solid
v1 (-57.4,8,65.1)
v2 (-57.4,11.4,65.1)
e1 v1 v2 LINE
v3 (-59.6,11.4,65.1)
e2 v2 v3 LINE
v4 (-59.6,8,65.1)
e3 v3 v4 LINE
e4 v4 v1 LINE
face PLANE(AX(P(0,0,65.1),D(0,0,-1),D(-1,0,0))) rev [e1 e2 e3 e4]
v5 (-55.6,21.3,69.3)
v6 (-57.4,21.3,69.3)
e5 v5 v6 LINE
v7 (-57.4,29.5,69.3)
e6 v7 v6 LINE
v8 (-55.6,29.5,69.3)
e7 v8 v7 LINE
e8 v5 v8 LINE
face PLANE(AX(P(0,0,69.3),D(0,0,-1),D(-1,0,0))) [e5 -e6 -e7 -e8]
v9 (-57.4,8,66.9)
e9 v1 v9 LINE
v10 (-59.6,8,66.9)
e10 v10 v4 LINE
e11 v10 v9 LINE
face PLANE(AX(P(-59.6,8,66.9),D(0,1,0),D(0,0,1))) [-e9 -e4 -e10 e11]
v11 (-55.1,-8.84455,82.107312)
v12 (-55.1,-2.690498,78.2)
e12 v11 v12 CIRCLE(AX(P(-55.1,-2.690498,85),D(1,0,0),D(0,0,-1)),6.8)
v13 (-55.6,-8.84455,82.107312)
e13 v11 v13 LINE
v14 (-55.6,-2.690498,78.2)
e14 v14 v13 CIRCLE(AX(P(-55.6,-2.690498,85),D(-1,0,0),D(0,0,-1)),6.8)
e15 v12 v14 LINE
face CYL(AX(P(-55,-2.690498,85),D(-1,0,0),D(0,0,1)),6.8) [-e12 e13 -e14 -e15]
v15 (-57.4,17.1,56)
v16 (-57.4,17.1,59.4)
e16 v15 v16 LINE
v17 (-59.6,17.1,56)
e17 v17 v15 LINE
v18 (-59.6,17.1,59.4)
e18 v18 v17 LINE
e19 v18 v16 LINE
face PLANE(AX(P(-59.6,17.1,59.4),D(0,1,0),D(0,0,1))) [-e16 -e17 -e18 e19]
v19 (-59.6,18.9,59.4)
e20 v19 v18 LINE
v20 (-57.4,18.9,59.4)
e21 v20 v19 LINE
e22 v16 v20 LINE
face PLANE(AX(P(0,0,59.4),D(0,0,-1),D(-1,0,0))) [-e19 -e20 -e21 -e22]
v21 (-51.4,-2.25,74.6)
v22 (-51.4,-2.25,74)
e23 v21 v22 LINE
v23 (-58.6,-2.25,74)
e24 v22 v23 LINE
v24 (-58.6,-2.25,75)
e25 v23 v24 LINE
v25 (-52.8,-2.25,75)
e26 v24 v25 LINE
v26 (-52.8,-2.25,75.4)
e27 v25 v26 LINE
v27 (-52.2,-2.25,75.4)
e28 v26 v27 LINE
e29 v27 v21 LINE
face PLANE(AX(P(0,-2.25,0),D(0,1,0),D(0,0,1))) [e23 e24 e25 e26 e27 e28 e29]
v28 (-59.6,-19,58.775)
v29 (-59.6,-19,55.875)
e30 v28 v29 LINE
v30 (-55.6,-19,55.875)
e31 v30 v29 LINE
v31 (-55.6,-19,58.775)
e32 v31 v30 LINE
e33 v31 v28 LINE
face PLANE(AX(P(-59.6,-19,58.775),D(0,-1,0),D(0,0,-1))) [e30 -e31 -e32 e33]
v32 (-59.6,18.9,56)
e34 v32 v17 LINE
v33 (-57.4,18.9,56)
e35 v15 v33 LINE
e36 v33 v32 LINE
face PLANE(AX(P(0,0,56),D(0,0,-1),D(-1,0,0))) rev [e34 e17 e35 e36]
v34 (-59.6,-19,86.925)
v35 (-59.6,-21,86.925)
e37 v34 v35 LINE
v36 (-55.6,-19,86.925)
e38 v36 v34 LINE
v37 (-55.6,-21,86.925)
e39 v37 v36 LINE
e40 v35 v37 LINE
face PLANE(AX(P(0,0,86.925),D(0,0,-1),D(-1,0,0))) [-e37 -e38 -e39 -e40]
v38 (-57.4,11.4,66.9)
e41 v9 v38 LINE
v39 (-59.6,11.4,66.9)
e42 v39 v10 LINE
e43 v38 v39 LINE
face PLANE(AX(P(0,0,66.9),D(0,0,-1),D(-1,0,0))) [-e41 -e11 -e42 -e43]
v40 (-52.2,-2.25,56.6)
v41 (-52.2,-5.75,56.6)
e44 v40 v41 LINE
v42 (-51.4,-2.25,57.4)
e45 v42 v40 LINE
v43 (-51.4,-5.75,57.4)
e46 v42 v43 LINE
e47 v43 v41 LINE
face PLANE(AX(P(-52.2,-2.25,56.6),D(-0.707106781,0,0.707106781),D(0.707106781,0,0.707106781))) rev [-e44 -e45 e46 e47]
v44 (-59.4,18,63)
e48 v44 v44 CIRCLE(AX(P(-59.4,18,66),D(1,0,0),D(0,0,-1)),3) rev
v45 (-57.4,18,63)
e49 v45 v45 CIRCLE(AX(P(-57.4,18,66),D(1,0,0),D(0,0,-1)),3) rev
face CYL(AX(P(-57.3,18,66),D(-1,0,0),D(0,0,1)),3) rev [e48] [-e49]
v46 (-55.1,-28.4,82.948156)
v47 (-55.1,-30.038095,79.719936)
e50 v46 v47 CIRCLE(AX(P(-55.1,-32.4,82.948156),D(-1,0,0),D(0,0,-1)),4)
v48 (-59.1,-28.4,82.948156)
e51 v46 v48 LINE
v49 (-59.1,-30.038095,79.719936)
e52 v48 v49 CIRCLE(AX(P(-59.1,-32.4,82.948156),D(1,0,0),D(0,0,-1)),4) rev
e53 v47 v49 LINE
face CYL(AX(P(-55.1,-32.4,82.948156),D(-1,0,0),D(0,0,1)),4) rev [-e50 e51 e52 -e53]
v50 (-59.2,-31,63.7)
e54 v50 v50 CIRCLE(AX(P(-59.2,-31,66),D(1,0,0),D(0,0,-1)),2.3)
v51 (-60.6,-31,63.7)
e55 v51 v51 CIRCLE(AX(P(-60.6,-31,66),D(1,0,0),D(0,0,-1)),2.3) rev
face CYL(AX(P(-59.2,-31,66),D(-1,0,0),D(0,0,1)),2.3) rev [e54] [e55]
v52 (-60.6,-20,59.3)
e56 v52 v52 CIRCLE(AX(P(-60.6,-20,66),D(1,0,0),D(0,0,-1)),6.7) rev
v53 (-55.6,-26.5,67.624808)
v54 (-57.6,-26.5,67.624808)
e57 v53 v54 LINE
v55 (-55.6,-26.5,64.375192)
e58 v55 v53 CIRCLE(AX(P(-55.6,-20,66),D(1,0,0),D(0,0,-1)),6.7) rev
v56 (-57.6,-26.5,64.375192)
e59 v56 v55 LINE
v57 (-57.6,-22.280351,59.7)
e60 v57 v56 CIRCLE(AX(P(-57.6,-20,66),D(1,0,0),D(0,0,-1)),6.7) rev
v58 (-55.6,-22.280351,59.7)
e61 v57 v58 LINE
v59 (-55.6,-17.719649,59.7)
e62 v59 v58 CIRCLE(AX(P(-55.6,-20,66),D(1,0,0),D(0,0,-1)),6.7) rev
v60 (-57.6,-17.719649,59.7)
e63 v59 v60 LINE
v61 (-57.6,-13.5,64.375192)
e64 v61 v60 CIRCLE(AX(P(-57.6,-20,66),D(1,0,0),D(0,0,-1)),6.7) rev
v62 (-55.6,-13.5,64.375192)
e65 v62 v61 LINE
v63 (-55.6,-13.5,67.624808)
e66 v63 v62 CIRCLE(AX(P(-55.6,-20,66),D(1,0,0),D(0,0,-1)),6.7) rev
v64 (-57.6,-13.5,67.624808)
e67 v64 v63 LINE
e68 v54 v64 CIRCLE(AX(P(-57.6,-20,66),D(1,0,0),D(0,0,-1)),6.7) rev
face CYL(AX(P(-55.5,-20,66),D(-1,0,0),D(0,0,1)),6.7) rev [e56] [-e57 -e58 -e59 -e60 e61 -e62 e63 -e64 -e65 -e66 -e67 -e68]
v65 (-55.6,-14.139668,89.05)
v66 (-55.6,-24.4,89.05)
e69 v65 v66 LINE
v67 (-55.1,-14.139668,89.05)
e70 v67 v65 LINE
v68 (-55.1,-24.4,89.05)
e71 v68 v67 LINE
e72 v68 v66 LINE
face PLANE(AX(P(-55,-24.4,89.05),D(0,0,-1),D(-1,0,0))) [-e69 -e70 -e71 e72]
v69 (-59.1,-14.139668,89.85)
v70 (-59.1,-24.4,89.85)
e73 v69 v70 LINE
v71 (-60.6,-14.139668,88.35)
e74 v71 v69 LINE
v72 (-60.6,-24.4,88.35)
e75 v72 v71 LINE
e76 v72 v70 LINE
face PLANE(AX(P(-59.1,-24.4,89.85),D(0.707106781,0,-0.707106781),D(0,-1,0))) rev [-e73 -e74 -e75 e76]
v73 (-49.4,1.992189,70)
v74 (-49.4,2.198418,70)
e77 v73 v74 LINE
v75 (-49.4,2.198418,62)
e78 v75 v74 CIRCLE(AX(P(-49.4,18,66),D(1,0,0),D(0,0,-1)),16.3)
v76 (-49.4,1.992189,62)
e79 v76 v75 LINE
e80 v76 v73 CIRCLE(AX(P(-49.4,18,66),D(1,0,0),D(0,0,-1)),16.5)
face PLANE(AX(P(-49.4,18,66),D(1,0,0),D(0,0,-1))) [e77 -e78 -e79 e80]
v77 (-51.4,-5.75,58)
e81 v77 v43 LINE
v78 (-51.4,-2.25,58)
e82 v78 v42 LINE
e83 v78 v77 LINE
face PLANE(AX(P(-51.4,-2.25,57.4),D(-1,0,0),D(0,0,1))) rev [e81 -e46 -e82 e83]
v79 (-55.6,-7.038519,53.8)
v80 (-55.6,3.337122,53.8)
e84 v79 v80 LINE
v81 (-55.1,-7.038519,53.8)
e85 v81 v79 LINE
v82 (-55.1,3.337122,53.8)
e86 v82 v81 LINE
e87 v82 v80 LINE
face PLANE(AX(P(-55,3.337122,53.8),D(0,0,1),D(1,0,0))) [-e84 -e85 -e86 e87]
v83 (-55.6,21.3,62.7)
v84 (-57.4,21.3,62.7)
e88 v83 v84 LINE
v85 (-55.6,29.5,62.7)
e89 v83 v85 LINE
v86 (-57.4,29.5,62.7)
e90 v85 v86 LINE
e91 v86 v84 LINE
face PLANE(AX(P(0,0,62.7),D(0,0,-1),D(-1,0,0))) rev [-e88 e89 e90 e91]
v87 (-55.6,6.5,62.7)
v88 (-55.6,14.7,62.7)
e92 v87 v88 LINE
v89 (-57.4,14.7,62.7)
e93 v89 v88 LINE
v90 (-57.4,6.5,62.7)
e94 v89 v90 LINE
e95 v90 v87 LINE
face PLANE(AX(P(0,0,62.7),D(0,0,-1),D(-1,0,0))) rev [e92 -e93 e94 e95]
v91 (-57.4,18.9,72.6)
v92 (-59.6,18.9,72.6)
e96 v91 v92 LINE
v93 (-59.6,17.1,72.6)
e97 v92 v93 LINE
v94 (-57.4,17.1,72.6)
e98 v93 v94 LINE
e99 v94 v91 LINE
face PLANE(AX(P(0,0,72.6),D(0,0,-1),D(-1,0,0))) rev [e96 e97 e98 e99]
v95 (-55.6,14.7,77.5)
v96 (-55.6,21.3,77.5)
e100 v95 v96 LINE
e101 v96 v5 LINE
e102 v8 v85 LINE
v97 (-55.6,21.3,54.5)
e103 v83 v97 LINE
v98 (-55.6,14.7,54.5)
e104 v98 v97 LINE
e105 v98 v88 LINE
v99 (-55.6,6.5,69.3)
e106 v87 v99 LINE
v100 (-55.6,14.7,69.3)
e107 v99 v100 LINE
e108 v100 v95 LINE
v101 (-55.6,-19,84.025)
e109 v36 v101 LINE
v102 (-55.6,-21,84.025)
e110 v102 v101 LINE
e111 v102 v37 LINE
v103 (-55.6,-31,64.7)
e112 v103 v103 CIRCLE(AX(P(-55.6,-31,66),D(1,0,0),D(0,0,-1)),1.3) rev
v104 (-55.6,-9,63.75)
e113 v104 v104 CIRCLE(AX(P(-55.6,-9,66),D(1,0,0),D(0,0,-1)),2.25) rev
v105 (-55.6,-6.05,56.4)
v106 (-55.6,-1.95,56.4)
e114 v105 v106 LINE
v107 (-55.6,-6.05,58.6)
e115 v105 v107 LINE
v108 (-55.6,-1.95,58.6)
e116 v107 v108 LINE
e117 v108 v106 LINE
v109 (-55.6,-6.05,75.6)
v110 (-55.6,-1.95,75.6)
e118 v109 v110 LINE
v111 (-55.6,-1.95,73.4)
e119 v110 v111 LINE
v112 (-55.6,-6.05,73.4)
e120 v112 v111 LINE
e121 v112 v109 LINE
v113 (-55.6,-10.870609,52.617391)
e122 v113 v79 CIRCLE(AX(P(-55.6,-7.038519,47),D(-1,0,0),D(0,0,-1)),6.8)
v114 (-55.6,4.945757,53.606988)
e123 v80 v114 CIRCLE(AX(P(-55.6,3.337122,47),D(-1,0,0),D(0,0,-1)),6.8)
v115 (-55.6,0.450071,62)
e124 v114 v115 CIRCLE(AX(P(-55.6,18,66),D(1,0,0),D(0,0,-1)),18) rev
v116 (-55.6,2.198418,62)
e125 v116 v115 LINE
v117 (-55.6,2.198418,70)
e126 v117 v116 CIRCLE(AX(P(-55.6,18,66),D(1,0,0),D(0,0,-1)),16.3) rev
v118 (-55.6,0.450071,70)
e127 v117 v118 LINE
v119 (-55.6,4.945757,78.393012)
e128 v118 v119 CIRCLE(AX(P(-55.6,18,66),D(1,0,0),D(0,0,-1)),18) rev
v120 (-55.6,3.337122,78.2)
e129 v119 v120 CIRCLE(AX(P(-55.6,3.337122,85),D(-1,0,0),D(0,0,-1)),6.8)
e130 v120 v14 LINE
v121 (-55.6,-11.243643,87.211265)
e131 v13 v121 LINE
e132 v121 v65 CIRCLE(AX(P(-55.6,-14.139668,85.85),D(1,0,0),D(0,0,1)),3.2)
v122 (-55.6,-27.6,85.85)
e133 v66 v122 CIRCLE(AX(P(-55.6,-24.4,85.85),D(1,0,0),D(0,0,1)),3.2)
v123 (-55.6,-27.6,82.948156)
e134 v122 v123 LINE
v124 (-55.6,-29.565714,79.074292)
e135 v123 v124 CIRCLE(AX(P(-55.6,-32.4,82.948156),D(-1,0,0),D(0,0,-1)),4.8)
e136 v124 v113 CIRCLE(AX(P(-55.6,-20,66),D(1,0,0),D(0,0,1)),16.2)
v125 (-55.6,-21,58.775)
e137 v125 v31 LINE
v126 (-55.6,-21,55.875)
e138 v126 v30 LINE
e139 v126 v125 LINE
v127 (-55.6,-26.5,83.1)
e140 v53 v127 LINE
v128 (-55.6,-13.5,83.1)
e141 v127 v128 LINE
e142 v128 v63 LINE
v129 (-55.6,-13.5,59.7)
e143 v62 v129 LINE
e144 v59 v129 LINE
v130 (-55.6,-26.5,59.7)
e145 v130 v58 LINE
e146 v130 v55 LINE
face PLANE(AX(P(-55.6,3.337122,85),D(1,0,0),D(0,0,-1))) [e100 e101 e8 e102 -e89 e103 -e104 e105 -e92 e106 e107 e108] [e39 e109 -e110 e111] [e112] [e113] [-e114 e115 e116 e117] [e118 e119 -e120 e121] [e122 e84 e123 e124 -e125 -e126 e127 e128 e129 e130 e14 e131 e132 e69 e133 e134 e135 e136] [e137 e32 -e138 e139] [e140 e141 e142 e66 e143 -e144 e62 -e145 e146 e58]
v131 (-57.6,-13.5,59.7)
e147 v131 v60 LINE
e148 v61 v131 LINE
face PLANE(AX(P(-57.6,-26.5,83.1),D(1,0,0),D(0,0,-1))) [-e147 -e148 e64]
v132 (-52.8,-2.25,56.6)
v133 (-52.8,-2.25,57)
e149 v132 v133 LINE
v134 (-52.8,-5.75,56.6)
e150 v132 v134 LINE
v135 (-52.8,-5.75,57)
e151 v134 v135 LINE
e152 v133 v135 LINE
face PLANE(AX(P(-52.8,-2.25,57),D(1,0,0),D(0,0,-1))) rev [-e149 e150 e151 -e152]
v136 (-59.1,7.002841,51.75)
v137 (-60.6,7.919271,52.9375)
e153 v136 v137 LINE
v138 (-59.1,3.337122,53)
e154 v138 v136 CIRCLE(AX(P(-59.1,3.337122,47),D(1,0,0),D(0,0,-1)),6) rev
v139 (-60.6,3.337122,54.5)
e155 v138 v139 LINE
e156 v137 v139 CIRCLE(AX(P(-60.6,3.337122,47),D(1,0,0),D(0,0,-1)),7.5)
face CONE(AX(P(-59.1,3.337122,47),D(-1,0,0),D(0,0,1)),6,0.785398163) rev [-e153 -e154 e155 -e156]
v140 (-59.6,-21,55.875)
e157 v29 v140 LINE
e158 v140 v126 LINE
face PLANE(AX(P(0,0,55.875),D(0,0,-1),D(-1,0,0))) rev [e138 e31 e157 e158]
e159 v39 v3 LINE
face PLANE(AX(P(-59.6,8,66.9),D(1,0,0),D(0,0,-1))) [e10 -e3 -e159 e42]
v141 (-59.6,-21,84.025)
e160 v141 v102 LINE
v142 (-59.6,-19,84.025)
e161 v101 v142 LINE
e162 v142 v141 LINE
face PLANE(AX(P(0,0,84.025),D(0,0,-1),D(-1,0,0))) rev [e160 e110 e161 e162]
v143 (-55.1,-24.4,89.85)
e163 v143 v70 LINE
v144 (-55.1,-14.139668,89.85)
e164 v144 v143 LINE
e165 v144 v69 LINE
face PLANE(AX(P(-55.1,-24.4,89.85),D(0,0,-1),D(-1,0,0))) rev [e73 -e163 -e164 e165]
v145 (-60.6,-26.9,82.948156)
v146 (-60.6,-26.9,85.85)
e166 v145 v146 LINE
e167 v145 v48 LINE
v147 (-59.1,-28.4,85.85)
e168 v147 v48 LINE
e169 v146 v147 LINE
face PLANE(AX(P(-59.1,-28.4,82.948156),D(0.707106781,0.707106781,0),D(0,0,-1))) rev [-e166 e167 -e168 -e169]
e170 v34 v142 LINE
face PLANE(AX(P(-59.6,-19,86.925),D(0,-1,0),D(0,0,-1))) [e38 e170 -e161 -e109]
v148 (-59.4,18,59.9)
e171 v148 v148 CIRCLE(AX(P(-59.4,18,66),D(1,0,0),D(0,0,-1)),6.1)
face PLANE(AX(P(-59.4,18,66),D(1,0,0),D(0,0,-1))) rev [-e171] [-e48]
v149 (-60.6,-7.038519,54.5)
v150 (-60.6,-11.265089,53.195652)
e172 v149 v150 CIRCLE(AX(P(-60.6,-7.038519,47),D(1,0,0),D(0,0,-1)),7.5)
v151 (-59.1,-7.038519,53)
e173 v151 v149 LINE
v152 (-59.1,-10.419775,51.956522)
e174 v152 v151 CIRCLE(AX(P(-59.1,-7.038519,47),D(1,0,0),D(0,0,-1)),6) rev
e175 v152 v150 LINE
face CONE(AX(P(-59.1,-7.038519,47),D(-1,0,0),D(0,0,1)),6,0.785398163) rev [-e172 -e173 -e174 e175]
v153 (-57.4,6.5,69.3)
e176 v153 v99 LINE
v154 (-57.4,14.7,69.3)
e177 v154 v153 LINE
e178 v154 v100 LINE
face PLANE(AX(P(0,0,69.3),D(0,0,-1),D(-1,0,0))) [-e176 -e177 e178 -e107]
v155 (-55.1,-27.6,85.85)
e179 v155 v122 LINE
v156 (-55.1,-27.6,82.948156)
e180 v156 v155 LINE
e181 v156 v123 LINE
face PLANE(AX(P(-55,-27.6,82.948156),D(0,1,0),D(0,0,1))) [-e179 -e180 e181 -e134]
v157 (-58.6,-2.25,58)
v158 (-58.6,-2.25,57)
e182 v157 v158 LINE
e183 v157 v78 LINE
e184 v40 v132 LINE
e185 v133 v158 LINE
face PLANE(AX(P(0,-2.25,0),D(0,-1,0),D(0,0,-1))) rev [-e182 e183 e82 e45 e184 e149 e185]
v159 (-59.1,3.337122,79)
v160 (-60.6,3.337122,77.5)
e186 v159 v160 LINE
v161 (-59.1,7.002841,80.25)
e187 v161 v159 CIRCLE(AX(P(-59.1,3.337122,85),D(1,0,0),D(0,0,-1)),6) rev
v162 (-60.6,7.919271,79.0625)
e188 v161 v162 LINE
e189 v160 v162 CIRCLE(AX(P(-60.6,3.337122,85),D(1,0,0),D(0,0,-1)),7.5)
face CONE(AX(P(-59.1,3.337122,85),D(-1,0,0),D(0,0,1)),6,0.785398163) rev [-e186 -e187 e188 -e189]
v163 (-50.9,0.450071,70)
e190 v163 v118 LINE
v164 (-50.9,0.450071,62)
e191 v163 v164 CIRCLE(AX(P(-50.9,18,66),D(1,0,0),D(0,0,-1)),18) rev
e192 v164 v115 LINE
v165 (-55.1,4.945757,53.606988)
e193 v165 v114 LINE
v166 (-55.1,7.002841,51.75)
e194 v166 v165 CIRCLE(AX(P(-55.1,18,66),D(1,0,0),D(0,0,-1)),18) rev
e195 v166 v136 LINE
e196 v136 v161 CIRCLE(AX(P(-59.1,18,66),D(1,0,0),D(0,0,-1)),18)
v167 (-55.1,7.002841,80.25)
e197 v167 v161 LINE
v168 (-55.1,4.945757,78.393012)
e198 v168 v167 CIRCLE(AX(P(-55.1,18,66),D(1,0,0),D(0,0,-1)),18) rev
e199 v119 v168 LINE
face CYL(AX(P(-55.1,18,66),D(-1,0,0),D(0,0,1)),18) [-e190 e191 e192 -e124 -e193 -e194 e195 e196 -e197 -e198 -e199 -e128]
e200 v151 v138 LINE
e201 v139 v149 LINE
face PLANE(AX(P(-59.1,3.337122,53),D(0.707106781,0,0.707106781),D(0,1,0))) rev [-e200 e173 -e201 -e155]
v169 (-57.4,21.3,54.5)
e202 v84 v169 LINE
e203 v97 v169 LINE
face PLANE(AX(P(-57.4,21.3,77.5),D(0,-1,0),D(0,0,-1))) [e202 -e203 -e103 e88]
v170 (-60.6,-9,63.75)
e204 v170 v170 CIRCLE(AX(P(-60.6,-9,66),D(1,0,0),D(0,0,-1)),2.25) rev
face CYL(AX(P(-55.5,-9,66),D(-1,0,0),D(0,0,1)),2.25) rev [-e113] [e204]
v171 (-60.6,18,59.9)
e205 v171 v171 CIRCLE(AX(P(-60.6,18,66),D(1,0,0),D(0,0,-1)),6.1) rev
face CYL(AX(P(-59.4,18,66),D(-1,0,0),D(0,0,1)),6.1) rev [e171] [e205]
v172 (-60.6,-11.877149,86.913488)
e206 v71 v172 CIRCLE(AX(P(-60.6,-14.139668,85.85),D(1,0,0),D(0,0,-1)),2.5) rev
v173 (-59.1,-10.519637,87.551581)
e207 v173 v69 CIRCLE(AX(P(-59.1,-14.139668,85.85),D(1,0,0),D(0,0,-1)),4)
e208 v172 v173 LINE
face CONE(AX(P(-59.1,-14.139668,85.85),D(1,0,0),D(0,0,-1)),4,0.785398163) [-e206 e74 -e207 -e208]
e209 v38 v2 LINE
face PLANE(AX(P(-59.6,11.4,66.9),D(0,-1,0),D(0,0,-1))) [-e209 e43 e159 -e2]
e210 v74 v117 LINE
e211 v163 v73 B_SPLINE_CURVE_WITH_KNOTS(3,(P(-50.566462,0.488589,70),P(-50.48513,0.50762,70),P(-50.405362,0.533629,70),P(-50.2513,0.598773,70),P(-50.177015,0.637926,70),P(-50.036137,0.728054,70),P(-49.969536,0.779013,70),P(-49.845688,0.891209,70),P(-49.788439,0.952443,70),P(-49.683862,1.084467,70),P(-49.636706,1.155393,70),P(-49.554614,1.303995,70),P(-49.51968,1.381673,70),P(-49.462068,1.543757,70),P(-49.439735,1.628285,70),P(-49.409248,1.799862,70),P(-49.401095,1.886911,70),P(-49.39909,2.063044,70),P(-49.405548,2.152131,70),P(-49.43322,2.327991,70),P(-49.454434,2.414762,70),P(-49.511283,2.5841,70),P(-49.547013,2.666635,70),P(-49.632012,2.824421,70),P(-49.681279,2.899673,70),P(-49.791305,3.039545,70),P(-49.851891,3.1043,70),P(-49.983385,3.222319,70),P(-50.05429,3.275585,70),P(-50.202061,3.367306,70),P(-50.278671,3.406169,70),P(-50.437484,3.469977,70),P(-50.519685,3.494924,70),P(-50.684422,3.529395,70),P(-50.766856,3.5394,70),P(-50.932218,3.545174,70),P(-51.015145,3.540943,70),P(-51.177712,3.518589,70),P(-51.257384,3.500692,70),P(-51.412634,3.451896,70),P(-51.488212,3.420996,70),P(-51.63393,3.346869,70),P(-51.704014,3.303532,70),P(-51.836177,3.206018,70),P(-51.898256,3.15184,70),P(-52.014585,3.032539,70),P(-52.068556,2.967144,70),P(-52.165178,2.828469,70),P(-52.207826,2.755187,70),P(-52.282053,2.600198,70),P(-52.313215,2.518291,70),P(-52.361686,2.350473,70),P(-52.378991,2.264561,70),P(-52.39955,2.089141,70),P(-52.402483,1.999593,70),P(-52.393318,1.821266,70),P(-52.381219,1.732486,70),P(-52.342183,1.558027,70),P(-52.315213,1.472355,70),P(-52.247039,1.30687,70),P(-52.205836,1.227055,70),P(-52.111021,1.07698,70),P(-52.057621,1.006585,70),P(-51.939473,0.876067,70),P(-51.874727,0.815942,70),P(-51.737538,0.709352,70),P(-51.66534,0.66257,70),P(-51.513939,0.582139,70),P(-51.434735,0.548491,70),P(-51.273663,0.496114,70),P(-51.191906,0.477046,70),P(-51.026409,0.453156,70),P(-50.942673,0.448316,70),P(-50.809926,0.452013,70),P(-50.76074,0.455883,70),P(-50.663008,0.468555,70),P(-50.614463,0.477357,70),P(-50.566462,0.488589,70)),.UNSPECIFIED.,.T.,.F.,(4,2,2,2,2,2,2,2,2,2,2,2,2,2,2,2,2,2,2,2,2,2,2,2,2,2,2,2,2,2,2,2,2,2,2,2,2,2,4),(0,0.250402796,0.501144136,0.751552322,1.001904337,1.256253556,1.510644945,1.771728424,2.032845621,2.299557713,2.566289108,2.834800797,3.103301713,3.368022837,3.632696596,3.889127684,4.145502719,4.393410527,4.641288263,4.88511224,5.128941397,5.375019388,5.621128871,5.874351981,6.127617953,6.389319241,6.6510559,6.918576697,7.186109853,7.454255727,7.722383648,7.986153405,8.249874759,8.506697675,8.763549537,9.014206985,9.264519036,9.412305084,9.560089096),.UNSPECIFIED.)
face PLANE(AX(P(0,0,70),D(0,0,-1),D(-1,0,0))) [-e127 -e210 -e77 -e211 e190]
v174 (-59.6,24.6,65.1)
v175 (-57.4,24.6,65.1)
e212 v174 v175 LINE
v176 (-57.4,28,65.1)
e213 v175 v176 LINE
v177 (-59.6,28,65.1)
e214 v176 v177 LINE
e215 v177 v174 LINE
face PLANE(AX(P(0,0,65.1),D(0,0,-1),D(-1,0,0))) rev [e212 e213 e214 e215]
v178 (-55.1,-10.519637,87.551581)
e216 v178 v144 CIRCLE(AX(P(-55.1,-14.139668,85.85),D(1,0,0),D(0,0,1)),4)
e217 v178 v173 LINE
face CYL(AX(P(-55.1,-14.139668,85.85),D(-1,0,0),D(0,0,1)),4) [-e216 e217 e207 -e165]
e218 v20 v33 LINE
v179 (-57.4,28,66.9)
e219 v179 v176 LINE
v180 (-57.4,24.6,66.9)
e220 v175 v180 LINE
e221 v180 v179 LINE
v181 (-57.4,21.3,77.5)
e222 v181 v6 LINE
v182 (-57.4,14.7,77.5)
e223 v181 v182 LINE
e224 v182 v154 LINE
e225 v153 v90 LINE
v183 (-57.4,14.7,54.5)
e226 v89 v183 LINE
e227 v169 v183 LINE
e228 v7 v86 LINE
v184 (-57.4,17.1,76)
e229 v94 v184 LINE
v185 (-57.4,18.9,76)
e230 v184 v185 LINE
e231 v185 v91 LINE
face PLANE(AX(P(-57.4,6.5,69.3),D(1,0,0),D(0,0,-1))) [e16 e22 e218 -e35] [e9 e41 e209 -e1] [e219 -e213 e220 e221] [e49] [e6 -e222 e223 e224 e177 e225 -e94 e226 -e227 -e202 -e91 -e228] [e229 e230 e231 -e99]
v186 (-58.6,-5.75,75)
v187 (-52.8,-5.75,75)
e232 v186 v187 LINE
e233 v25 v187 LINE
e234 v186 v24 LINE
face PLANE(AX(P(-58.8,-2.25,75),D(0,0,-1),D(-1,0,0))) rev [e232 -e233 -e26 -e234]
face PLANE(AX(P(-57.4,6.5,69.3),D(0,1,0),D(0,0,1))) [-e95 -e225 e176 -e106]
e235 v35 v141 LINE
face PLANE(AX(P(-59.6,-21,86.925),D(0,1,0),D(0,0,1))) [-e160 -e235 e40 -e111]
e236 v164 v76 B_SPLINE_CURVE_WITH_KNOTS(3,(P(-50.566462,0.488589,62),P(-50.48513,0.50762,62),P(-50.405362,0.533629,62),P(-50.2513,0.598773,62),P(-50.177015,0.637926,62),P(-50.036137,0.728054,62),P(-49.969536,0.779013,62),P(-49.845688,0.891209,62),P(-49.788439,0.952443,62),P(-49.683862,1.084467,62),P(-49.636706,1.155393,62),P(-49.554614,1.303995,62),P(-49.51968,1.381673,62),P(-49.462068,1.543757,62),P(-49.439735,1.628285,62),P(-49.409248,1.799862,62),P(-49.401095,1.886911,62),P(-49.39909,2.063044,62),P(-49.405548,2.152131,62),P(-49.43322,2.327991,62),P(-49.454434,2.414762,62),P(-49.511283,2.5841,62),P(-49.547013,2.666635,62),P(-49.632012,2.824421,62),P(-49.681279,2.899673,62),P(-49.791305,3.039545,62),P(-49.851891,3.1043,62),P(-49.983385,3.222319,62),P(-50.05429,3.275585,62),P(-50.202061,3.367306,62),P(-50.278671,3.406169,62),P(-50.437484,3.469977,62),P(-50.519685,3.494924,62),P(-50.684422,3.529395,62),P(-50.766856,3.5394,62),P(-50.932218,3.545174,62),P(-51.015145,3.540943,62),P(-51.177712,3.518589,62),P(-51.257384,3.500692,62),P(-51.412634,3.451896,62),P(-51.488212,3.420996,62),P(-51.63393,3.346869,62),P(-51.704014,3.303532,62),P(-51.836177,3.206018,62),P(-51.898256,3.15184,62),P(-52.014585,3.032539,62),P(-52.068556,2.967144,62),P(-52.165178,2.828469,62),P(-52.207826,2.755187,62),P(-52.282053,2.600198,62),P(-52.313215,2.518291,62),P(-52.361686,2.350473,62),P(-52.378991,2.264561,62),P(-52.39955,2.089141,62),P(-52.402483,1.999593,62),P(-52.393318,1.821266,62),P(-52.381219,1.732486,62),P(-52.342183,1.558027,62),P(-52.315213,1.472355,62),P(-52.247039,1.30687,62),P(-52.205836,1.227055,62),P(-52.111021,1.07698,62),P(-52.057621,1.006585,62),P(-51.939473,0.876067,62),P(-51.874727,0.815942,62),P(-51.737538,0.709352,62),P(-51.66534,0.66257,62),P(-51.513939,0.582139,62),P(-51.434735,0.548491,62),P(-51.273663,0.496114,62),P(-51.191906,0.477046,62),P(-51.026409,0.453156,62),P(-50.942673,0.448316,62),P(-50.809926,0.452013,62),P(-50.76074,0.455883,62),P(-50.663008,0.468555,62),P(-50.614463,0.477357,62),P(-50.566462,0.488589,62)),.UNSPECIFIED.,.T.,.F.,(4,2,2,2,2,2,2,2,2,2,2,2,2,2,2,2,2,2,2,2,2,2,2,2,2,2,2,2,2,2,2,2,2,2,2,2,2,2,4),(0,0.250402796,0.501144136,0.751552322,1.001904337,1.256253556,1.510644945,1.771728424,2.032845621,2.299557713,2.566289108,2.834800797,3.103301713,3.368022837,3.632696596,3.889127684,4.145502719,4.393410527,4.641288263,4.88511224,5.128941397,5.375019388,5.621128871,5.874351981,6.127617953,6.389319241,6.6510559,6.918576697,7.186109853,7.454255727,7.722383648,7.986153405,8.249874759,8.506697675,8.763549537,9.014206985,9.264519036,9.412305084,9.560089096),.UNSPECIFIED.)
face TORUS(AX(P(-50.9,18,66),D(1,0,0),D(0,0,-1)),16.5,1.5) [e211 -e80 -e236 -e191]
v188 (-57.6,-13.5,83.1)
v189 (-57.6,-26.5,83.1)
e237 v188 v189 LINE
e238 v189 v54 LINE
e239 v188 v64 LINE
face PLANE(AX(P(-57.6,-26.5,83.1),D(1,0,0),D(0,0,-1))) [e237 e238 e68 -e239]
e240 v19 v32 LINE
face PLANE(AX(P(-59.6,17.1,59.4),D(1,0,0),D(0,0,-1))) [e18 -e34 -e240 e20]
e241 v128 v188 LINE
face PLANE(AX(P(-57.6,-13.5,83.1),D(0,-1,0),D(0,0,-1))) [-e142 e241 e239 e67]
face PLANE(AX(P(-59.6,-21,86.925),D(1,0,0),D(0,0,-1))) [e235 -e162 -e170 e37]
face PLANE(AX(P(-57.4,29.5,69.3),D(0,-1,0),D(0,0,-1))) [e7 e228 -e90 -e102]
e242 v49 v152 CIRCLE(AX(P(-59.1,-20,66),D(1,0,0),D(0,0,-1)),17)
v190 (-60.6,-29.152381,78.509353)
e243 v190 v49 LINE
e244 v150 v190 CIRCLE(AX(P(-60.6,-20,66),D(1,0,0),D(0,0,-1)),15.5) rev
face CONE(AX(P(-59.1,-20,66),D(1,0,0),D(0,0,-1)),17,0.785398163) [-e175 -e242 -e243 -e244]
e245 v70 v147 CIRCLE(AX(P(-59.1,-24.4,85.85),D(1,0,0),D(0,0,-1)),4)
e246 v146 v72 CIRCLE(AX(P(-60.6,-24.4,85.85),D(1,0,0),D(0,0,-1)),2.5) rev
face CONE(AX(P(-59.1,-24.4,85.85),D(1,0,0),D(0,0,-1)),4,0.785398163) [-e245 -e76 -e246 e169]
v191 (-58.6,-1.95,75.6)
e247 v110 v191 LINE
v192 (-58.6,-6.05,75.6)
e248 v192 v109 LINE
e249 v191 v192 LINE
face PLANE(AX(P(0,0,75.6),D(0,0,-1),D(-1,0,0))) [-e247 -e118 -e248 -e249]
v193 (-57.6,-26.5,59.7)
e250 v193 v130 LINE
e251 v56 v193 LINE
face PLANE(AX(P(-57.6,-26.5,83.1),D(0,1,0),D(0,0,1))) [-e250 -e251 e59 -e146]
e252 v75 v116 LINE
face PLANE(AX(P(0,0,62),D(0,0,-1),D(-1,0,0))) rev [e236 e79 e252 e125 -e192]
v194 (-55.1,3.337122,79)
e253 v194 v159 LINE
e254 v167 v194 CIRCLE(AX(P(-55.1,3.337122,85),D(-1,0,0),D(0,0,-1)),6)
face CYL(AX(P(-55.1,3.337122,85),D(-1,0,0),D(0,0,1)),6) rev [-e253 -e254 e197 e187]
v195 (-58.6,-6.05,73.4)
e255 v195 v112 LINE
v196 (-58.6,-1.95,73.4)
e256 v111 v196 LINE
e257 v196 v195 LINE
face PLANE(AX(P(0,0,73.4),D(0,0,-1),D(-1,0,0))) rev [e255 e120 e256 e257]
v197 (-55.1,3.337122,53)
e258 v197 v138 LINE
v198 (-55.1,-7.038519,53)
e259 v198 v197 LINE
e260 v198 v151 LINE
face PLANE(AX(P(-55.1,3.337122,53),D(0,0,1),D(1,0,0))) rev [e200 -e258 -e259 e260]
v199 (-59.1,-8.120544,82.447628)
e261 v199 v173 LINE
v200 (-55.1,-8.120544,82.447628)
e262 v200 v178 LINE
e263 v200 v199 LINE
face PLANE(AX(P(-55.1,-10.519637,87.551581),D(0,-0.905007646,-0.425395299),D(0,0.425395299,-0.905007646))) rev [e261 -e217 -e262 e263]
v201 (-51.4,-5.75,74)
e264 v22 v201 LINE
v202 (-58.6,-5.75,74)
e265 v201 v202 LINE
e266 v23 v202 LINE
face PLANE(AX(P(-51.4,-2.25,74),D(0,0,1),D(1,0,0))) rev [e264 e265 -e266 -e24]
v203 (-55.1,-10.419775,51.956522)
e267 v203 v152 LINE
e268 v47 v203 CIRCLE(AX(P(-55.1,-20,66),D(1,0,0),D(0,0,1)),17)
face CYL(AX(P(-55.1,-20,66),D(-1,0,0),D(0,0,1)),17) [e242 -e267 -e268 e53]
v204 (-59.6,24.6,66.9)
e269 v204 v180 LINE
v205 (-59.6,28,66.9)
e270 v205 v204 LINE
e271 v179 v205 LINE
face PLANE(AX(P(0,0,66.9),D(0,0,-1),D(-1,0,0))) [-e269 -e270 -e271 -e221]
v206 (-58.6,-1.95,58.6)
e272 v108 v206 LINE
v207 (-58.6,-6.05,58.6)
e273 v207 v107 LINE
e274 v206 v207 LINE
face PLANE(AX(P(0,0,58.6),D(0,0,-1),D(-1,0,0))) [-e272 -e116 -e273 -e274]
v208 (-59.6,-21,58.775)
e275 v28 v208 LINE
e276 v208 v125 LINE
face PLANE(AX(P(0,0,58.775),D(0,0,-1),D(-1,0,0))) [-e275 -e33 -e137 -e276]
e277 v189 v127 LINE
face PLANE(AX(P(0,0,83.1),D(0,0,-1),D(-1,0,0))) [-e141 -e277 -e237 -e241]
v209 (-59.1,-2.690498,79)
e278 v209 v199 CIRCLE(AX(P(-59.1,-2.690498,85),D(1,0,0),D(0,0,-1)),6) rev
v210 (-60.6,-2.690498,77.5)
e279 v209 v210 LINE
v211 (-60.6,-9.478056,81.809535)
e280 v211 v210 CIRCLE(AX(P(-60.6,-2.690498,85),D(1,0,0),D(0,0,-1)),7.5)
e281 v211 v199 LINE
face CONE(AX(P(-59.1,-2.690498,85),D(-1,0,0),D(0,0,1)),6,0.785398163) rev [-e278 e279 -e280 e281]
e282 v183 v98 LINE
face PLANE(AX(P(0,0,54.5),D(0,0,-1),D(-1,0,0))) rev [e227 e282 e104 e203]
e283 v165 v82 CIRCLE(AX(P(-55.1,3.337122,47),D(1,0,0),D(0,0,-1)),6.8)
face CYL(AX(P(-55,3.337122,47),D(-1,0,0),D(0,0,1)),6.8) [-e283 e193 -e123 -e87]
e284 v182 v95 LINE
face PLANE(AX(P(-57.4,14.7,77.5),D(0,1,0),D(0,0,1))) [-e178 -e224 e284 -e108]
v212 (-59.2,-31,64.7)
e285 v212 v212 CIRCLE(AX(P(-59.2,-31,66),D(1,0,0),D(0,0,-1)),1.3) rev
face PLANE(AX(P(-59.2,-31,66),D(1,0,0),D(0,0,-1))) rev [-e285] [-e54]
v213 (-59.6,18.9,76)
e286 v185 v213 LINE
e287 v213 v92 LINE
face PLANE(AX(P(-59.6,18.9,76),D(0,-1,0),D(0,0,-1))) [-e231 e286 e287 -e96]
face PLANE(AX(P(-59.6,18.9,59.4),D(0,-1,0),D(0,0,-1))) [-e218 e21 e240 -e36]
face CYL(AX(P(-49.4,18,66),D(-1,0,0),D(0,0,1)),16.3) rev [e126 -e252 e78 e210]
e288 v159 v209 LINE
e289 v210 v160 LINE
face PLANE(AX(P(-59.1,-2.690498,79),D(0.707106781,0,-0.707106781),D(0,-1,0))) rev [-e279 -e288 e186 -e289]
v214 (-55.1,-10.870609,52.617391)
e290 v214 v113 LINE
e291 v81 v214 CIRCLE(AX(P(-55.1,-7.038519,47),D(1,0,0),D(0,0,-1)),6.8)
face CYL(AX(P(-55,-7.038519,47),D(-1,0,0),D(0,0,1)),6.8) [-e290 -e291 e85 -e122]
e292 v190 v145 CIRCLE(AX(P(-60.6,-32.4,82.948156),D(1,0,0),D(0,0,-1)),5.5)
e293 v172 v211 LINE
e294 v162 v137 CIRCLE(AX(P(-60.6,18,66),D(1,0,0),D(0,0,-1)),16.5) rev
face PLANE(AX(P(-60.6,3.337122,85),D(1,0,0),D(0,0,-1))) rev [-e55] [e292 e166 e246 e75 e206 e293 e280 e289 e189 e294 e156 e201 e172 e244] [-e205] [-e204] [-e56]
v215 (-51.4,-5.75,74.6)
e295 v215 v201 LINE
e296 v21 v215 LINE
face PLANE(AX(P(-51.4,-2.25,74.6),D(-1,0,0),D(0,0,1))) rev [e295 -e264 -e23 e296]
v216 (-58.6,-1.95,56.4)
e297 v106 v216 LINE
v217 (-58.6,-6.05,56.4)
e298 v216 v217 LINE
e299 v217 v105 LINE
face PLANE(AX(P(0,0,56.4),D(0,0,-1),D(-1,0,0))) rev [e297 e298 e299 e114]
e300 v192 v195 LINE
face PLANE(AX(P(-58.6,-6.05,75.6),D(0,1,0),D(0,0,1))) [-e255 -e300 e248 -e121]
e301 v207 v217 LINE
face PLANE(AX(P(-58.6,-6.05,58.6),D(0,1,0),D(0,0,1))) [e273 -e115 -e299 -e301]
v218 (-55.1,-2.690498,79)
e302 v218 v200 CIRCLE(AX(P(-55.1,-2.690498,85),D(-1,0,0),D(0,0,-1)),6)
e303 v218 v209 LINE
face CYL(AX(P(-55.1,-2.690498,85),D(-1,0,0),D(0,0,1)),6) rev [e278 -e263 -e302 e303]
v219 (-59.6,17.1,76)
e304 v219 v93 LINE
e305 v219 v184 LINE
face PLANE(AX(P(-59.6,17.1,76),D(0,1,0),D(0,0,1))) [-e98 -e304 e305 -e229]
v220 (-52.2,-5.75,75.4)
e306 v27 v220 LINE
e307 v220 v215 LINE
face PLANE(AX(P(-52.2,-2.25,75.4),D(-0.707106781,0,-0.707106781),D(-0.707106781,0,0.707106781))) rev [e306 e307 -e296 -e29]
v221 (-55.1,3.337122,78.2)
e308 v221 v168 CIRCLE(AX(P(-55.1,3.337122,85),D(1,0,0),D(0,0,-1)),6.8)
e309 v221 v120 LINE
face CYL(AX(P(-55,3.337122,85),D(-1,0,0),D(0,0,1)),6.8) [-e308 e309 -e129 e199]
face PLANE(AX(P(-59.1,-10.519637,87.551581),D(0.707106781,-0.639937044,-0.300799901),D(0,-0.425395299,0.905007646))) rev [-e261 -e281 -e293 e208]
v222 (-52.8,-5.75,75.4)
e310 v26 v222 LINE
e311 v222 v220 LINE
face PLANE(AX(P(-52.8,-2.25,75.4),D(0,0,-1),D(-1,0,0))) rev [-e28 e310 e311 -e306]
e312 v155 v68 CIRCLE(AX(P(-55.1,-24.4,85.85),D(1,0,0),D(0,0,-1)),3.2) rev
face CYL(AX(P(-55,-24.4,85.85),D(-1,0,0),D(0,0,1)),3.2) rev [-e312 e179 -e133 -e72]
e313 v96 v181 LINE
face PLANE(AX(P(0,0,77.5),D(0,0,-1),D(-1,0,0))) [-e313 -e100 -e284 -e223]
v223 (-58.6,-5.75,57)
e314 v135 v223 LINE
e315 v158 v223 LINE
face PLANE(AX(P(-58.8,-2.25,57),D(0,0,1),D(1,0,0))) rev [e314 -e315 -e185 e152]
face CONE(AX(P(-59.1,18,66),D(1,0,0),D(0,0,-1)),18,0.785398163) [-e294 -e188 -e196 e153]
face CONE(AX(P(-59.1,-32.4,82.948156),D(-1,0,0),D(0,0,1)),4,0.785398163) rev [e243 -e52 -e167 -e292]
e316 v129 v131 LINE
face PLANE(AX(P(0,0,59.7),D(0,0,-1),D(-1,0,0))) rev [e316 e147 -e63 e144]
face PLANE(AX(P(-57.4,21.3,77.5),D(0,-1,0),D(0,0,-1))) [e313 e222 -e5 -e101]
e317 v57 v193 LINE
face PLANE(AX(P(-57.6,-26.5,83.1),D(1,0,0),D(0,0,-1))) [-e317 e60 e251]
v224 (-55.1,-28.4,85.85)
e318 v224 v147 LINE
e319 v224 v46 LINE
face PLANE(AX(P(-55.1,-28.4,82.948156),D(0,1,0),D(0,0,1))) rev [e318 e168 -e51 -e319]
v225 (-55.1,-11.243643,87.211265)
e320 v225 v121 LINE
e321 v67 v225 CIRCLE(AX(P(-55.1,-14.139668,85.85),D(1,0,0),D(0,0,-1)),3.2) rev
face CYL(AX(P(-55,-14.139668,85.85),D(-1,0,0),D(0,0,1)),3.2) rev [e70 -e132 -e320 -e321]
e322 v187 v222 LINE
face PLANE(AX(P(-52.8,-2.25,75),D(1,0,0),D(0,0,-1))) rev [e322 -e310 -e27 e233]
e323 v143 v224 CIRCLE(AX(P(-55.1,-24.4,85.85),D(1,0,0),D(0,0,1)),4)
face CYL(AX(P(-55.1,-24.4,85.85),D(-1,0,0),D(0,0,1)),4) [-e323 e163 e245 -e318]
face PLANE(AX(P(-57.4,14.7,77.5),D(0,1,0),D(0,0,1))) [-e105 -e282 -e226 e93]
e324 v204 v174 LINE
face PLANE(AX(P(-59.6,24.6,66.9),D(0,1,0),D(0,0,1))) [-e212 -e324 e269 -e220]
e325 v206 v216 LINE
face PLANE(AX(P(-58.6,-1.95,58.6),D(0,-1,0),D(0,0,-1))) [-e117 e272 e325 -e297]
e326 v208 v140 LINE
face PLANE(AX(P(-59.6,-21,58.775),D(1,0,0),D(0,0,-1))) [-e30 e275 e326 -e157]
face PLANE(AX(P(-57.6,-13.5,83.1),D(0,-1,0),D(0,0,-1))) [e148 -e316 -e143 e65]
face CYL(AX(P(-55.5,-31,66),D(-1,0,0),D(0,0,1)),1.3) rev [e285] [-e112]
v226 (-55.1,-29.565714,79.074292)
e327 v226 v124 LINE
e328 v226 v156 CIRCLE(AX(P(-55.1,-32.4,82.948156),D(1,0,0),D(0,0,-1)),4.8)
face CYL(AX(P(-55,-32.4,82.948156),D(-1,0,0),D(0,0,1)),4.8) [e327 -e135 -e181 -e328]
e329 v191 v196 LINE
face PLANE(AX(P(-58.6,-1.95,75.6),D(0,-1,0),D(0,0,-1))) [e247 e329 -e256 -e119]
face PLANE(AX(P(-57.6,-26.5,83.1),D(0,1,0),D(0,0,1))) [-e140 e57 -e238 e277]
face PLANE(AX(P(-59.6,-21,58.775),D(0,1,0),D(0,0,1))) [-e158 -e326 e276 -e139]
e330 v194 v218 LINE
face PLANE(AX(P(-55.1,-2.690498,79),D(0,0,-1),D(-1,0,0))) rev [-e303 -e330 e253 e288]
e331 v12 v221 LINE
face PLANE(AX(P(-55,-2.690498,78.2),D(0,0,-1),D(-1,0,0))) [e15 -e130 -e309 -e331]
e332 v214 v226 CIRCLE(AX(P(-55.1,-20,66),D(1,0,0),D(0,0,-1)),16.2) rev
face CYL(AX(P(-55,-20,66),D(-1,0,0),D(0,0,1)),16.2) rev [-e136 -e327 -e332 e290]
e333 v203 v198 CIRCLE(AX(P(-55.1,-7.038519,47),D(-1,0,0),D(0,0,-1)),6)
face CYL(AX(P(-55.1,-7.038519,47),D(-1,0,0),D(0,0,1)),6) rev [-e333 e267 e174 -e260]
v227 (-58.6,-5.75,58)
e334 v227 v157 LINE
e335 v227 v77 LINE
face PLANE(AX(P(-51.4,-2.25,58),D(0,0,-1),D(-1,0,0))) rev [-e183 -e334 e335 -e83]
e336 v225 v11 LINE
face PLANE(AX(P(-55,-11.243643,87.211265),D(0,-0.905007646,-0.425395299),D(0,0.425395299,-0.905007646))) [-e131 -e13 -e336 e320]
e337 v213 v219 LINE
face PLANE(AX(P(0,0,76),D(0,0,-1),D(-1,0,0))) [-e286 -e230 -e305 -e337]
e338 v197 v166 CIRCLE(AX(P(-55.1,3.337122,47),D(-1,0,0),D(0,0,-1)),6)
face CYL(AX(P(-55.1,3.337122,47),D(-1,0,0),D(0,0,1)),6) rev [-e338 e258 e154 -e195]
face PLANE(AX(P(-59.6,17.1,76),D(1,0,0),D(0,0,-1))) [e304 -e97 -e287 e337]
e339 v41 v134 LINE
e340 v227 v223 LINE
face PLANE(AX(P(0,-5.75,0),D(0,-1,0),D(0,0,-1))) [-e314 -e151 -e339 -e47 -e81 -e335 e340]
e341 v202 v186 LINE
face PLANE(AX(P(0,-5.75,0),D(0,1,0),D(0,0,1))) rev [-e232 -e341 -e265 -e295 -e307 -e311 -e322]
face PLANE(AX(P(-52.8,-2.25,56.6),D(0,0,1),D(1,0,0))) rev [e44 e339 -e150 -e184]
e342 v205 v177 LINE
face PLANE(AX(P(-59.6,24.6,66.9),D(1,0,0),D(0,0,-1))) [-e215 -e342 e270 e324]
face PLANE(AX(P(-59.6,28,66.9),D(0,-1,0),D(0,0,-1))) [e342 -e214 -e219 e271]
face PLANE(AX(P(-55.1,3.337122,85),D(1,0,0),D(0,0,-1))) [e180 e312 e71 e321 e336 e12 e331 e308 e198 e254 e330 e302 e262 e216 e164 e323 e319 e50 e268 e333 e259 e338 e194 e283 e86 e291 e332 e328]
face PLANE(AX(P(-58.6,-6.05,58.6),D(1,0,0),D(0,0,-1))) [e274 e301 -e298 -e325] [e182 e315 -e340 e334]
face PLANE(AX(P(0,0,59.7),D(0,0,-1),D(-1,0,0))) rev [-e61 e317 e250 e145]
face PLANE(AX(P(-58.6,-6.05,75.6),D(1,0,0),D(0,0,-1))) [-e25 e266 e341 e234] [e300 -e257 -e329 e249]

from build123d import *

# Parameters (mm, degrees)
BOSS_EXTRUDE1_START  = -60.6
BOSS_EXTRUDE1_DEPTH  = 5.5
BOSS_EXTRUDE2_START  = -55.6
BOSS_EXTRUDE2_DEPTH  = 0.6
BOSS_EXTRUDE3_START  = -55.6
SKETCH3_R            = 18
SKETCH3_R_2          = 16.3
BOSS_EXTRUDE3_DEPTH  = 6.2
CHAMFER1_SIZE        = 1.5
FILLET1_R            = 1.5
BOSS_EXTRUDE4_START  = 62.7
SKETCH4_W            = 2.3
SKETCH4_H            = 23
BOSS_EXTRUDE4_DEPTH  = 6.6
BOSS_EXTRUDE5_START  = 54.5
SKETCH5_W            = 2.3
SKETCH5_H            = 6.6
BOSS_EXTRUDE5_DEPTH  = 23
BOSS_EXTRUDE6_START  = -57.4
SKETCH6_R            = 4.6
BOSS_EXTRUDE6_DEPTH  = 2.3
BOSS_EXTRUDE7_START  = -61.1
SKETCH7_R            = 6.1
BOSS_EXTRUDE7_DEPTH  = 1.7
BOSS_EXTRUDE8_START  = -59.5
SKETCH8_R            = 3
BOSS_EXTRUDE8_DEPTH  = 2.2
BOSS_EXTRUDE9_START  = 65.1
SKETCH9_W            = 2.3
SKETCH9_H            = 3.4
BOSS_EXTRUDE9_DEPTH  = 1.8
BOSS_EXTRUDE10_START = 72.6
SKETCH10_W           = 2.3
SKETCH10_H           = 1.8
BOSS_EXTRUDE10_DEPTH = 3.4
BOSS_EXTRUDE11_START = 65.1
SKETCH11_W           = 2.3
SKETCH11_H           = 3.4
BOSS_EXTRUDE11_DEPTH = 1.8
BOSS_EXTRUDE12_START = 56
SKETCH12_W           = 2.3
SKETCH12_H           = 1.8
BOSS_EXTRUDE12_DEPTH = 3.4
BOSS_EXTRUDE13_START = 62
SKETCH13_W           = 6.3
SKETCH13_H           = 3.098417801
BOSS_EXTRUDE13_DEPTH = 8
BOSS_EXTRUDE14_START = 55.875
SKETCH14_W           = 4.1
SKETCH14_H           = 2
BOSS_EXTRUDE14_DEPTH = 2.9
BOSS_EXTRUDE15_START = 84.025
SKETCH15_W           = 4.1
SKETCH15_H           = 2
BOSS_EXTRUDE15_DEPTH = 2.9
BOSS_EXTRUDE16_START = 59.7
SKETCH16_W           = 2.1
SKETCH16_H           = 13
BOSS_EXTRUDE16_DEPTH = 23.4
BOSS_EXTRUDE17_START = -61.1
SKETCH17_R           = 6.7
BOSS_EXTRUDE17_DEPTH = 5.6
BOSS_EXTRUDE18_START = -61.1
SKETCH18_R           = 2.25
BOSS_EXTRUDE18_DEPTH = 5.6
BOSS_EXTRUDE19_START = -61.1
SKETCH19_R           = 2.3
BOSS_EXTRUDE19_DEPTH = 1.9
BOSS_EXTRUDE20_START = -59.25
SKETCH20_R           = 1.3
BOSS_EXTRUDE20_DEPTH = 3.75
BOSS_EXTRUDE21_START = 56.4
SKETCH21_W           = 3.1
SKETCH21_H           = 4.1
BOSS_EXTRUDE21_DEPTH = 2.2
BOSS_EXTRUDE22_START = -5.75
BOSS_EXTRUDE22_DEPTH = 3.5
BOSS_EXTRUDE23_START = 73.4
SKETCH23_W           = 3.1
SKETCH23_H           = 4.1
BOSS_EXTRUDE23_DEPTH = 2.2
BOSS_EXTRUDE24_START = -5.75
BOSS_EXTRUDE24_DEPTH = 3.5


with BuildPart() as part:
    # Sketch1 → Boss-Extrude1 (new body)
    with BuildSketch(Plane(origin=(0, 0, 0), x_dir=(0, 0, -1), z_dir=(1, 0, 0)).offset(BOSS_EXTRUDE1_START)):
        with BuildLine():
            Line((-53, 3.337121701), (-53, -7.038518603))
            ThreePointArc((-53, -7.038518603), (-52.733198515, -8.807822077), (-51.956521739, -10.41977462))
            ThreePointArc((-51.956521739, -10.41977462), (-56.18950583, -33.883594784), (-79.719936005, -30.038095238))
            ThreePointArc((-79.719936005, -30.038095238), (-81.138131249, -28.832955071), (-82.948156242, -28.4))
            Line((-82.948156242, -28.4), (-85.85, -28.4))
            ThreePointArc((-85.85, -28.4), (-88.678427125, -27.228427125), (-89.85, -24.4))
            Line((-89.85, -24.4), (-89.85, -14.139667829))
            ThreePointArc((-89.85, -14.139667829), (-89.226856881, -11.995644133), (-87.551581196, -10.519637244))
            Line((-87.551581196, -10.519637244), (-82.447628205, -8.120544133))
            ThreePointArc((-82.447628205, -8.120544133), (-79.934714679, -5.9065338), (-79, -2.690498257))
            Line((-79, -2.690498257), (-79, 3.337121701))
            ThreePointArc((-79, 3.337121701), (-79.321091654, 5.273613374), (-80.25, 7.002841276))
            ThreePointArc((-80.25, 7.002841276), (-66, 36), (-51.75, 7.002841276))
            ThreePointArc((-51.75, 7.002841276), (-52.678908346, 5.273613374), (-53, 3.337121701))
        make_face()
    extrude(amount=BOSS_EXTRUDE1_DEPTH)


with BuildPart() as body_2:
    # Sketch2 → Boss-Extrude2 (new body)
    with BuildSketch(Plane(origin=(0, 0, 0), x_dir=(0, 0, -1), z_dir=(1, 0, 0)).offset(BOSS_EXTRUDE2_START)):
        with BuildLine():
            Line((-53.8, 3.337121701), (-53.8, -7.038518603))
            ThreePointArc((-53.8, -7.038518603), (-53.497624984, -9.043729207), (-52.617391304, -10.870608755))
            ThreePointArc((-52.617391304, -10.870608755), (-56.651176143, -33.230249147), (-79.074291958, -29.565714286))
            ThreePointArc((-79.074291958, -29.565714286), (-80.77612625, -28.119546085), (-82.948156242, -27.6))
            Line((-82.948156242, -27.6), (-85.85, -27.6))
            ThreePointArc((-85.85, -27.6), (-88.1127417, -26.6627417), (-89.05, -24.4))
            Line((-89.05, -24.4), (-89.05, -14.139667829))
            ThreePointArc((-89.05, -14.139667829), (-88.551485505, -12.424448872), (-87.211264957, -11.243643361))
            Line((-87.211264957, -11.243643361), (-82.107311966, -8.84455025))
            ThreePointArc((-82.107311966, -8.84455025), (-79.259343303, -6.335338539), (-78.2, -2.690498257))
            Line((-78.2, -2.690498257), (-78.2, 3.337121701))
            ThreePointArc((-78.2, 3.337121701), (-78.563903875, 5.531812264), (-79.616666667, 7.491603886))
            ThreePointArc((-79.616666667, 7.491603886), (-66, 35.2), (-52.383333333, 7.491603886))
            ThreePointArc((-52.383333333, 7.491603886), (-53.436096125, 5.531812264), (-53.8, 3.337121701))
        make_face()
    extrude(amount=BOSS_EXTRUDE2_DEPTH)


with BuildPart() as part_1:
    add(part.part)

    # Combine1: cut body 2
    add(body_2.part, mode=Mode.SUBTRACT)

    # Sketch3 → Boss-Extrude3 (add)
    with BuildSketch(Plane(origin=(0, 0, 0), x_dir=(0, 0, -1), z_dir=(1, 0, 0)).offset(BOSS_EXTRUDE3_START)):
        with Locations(Location((-66, 18, 0), (0, 0, 217.658462006))):
            Circle(SKETCH3_R)
        with Locations((-66, 18)):
            Circle(SKETCH3_R_2, mode=Mode.SUBTRACT)
    extrude(amount=BOSS_EXTRUDE3_DEPTH)

    # Chamfer1
    chamfer1_edges = [part_1.edges().sort_by_distance(p)[0] for p in [
        (-60.6, 36, 66),
        (-60.6, 5.273613374, 52.678908346),
        (-60.6, -1.850698451, 53),
        (-60.6, -8.807822077, 52.733198515),
        (-60.6, -33.883594784, 56.18950583),
        (-60.6, -28.832955071, 81.138131249),
        (-60.6, -28.4, 84.399078121),
        (-60.6, -27.228427125, 88.678427125),
        (-60.6, -19.269833914, 89.85),
        (-60.6, -11.995644133, 89.226856881),
        (-60.6, -9.320090689, 84.999604701),
        (-60.6, -5.9065338, 79.934714679),
        (-60.6, 0.323311722, 79),
        (-60.6, 5.273613374, 79.321091654),
    ]]
    chamfer(chamfer1_edges, length=CHAMFER1_SIZE)

    # Fillet1
    fillet1_edges = [part_1.edges().sort_by_distance(p)[0] for p in [
        (-49.4, 28.997158724, 51.75),
    ]]
    fillet(fillet1_edges, radius=FILLET1_R)


with BuildPart() as body_2_2:
    # Sketch4 → Boss-Extrude4 (new body)
    with BuildSketch(Plane.XY.offset(BOSS_EXTRUDE4_START)):
        with Locations((-56.25, 18)):
            Rectangle(SKETCH4_W, SKETCH4_H)
    extrude(amount=BOSS_EXTRUDE4_DEPTH)


with BuildPart() as part_2:
    add(part_1.part)

    # Combine2: cut body 2 2
    add(body_2_2.part, mode=Mode.SUBTRACT)


with BuildPart() as body_2_3:
    # Sketch5 → Boss-Extrude5 (new body)
    with BuildSketch(Plane.XY.offset(BOSS_EXTRUDE5_START)):
        with Locations((-56.25, 18)):
            Rectangle(SKETCH5_W, SKETCH5_H)
    extrude(amount=BOSS_EXTRUDE5_DEPTH)


with BuildPart() as part_3:
    add(part_2.part)

    # Combine3: cut body 2 3
    add(body_2_3.part, mode=Mode.SUBTRACT)


with BuildPart() as body_2_4:
    # Sketch6 → Boss-Extrude6 (new body)
    with BuildSketch(Plane(origin=(0, 0, 0), x_dir=(0, 0, -1), z_dir=(1, 0, 0)).offset(BOSS_EXTRUDE6_START)):
        with Locations((-66, 18)):
            Circle(SKETCH6_R)
    extrude(amount=BOSS_EXTRUDE6_DEPTH)


with BuildPart() as part_4:
    add(part_3.part)

    # Combine4: cut body 2 4
    add(body_2_4.part, mode=Mode.SUBTRACT)


with BuildPart() as body_2_5:
    # Sketch7 → Boss-Extrude7 (new body)
    with BuildSketch(Plane(origin=(0, 0, 0), x_dir=(0, 0, -1), z_dir=(1, 0, 0)).offset(BOSS_EXTRUDE7_START)):
        with Locations((-66, 18)):
            Circle(SKETCH7_R)
    extrude(amount=BOSS_EXTRUDE7_DEPTH)


with BuildPart() as part_5:
    add(part_4.part)

    # Combine5: cut body 2 5
    add(body_2_5.part, mode=Mode.SUBTRACT)


with BuildPart() as body_2_6:
    # Sketch8 → Boss-Extrude8 (new body)
    with BuildSketch(Plane(origin=(0, 0, 0), x_dir=(0, 0, -1), z_dir=(1, 0, 0)).offset(BOSS_EXTRUDE8_START)):
        with Locations((-66, 18)):
            Circle(SKETCH8_R)
    extrude(amount=BOSS_EXTRUDE8_DEPTH)


with BuildPart() as part_6:
    add(part_5.part)

    # Combine6: cut body 2 6
    add(body_2_6.part, mode=Mode.SUBTRACT)


with BuildPart() as body_2_7:
    # Sketch9 → Boss-Extrude9 (new body)
    with BuildSketch(Plane.XY.offset(BOSS_EXTRUDE9_START)):
        with Locations((-58.45, 26.3)):
            Rectangle(SKETCH9_W, SKETCH9_H)
    extrude(amount=BOSS_EXTRUDE9_DEPTH)


with BuildPart() as part_7:
    add(part_6.part)

    # Combine7: cut body 2 7
    add(body_2_7.part, mode=Mode.SUBTRACT)


with BuildPart() as body_2_8:
    # Sketch10 → Boss-Extrude10 (new body)
    with BuildSketch(Plane.XY.offset(BOSS_EXTRUDE10_START)):
        with Locations((-58.45, 18)):
            Rectangle(SKETCH10_W, SKETCH10_H)
    extrude(amount=BOSS_EXTRUDE10_DEPTH)


with BuildPart() as part_8:
    add(part_7.part)

    # Combine8: cut body 2 8
    add(body_2_8.part, mode=Mode.SUBTRACT)


with BuildPart() as body_2_9:
    # Sketch11 → Boss-Extrude11 (new body)
    with BuildSketch(Plane.XY.offset(BOSS_EXTRUDE11_START)):
        with Locations((-58.45, 9.7)):
            Rectangle(SKETCH11_W, SKETCH11_H)
    extrude(amount=BOSS_EXTRUDE11_DEPTH)


with BuildPart() as part_9:
    add(part_8.part)

    # Combine9: cut body 2 9
    add(body_2_9.part, mode=Mode.SUBTRACT)


with BuildPart() as body_2_10:
    # Sketch12 → Boss-Extrude12 (new body)
    with BuildSketch(Plane.XY.offset(BOSS_EXTRUDE12_START)):
        with Locations((-58.45, 18)):
            Rectangle(SKETCH12_W, SKETCH12_H)
    extrude(amount=BOSS_EXTRUDE12_DEPTH)


with BuildPart() as part_10:
    add(part_9.part)

    # Combine10: cut body 2 10
    add(body_2_10.part, mode=Mode.SUBTRACT)


with BuildPart() as body_2_11:
    # Sketch13 → Boss-Extrude13 (new body)
    with BuildSketch(Plane.XY.offset(BOSS_EXTRUDE13_START)):
        with Locations((-52.45, 0.9492089)):
            Rectangle(SKETCH13_W, SKETCH13_H)
    extrude(amount=BOSS_EXTRUDE13_DEPTH)


with BuildPart() as part_11:
    add(part_10.part)

    # Combine11: cut body 2 11
    add(body_2_11.part, mode=Mode.SUBTRACT)


with BuildPart() as body_2_12:
    # Sketch14 → Boss-Extrude14 (new body)
    with BuildSketch(Plane.XY.offset(BOSS_EXTRUDE14_START)):
        with Locations((-57.55, -20)):
            Rectangle(SKETCH14_W, SKETCH14_H)
    extrude(amount=BOSS_EXTRUDE14_DEPTH)


with BuildPart() as part_12:
    add(part_11.part)

    # Combine12: cut body 2 12
    add(body_2_12.part, mode=Mode.SUBTRACT)


with BuildPart() as body_2_13:
    # Sketch15 → Boss-Extrude15 (new body)
    with BuildSketch(Plane.XY.offset(BOSS_EXTRUDE15_START)):
        with Locations((-57.55, -20)):
            Rectangle(SKETCH15_W, SKETCH15_H)
    extrude(amount=BOSS_EXTRUDE15_DEPTH)


with BuildPart() as part_13:
    add(part_12.part)

    # Combine13: cut body 2 13
    add(body_2_13.part, mode=Mode.SUBTRACT)


with BuildPart() as body_2_14:
    # Sketch16 → Boss-Extrude16 (new body)
    with BuildSketch(Plane.XY.offset(BOSS_EXTRUDE16_START)):
        with Locations((-56.55, -20)):
            Rectangle(SKETCH16_W, SKETCH16_H)
    extrude(amount=BOSS_EXTRUDE16_DEPTH)


with BuildPart() as part_14:
    add(part_13.part)

    # Combine14: cut body 2 14
    add(body_2_14.part, mode=Mode.SUBTRACT)


with BuildPart() as body_2_15:
    # Sketch17 → Boss-Extrude17 (new body)
    with BuildSketch(Plane(origin=(0, 0, 0), x_dir=(0, 0, -1), z_dir=(1, 0, 0)).offset(BOSS_EXTRUDE17_START)):
        with Locations((-66, -20)):
            Circle(SKETCH17_R)
    extrude(amount=BOSS_EXTRUDE17_DEPTH)


with BuildPart() as part_15:
    add(part_14.part)

    # Combine15: cut body 2 15
    add(body_2_15.part, mode=Mode.SUBTRACT)


with BuildPart() as body_2_16:
    # Sketch18 → Boss-Extrude18 (new body)
    with BuildSketch(Plane(origin=(0, 0, 0), x_dir=(0, 0, -1), z_dir=(1, 0, 0)).offset(BOSS_EXTRUDE18_START)):
        with Locations((-66, -9)):
            Circle(SKETCH18_R)
    extrude(amount=BOSS_EXTRUDE18_DEPTH)


with BuildPart() as part_16:
    add(part_15.part)

    # Combine16: cut body 2 16
    add(body_2_16.part, mode=Mode.SUBTRACT)


with BuildPart() as body_2_17:
    # Sketch19 → Boss-Extrude19 (new body)
    with BuildSketch(Plane(origin=(0, 0, 0), x_dir=(0, 0, -1), z_dir=(1, 0, 0)).offset(BOSS_EXTRUDE19_START)):
        with Locations((-66, -31)):
            Circle(SKETCH19_R)
    extrude(amount=BOSS_EXTRUDE19_DEPTH)


with BuildPart() as part_17:
    add(part_16.part)

    # Combine17: cut body 2 17
    add(body_2_17.part, mode=Mode.SUBTRACT)


with BuildPart() as body_2_18:
    # Sketch20 → Boss-Extrude20 (new body)
    with BuildSketch(Plane(origin=(0, 0, 0), x_dir=(0, 0, -1), z_dir=(1, 0, 0)).offset(BOSS_EXTRUDE20_START)):
        with Locations((-66, -31)):
            Circle(SKETCH20_R)
    extrude(amount=BOSS_EXTRUDE20_DEPTH)


with BuildPart() as part_18:
    add(part_17.part)

    # Combine18: cut body 2 18
    add(body_2_18.part, mode=Mode.SUBTRACT)


with BuildPart() as body_2_19:
    # Sketch21 → Boss-Extrude21 (new body)
    with BuildSketch(Plane.XY.offset(BOSS_EXTRUDE21_START)):
        with Locations((-57.05, -4)):
            Rectangle(SKETCH21_W, SKETCH21_H)
    extrude(amount=BOSS_EXTRUDE21_DEPTH)


with BuildPart() as part_19:
    add(part_18.part)

    # Combine19: cut body 2 19
    add(body_2_19.part, mode=Mode.SUBTRACT)

    # Sketch22 → Boss-Extrude22 (add)
    with BuildSketch(Plane(origin=(0, 0, 0), x_dir=(1, 0, 0), z_dir=(0, 1, 0)).offset(BOSS_EXTRUDE22_START)):
        Polygon((-58.8, -58), (-58.8, -57), (-52.8, -57), (-52.8, -56.6), (-52.2, -56.6), (-51.4, -57.4), (-51.4, -58), align=None)
    extrude(amount=BOSS_EXTRUDE22_DEPTH)


with BuildPart() as body_2_20:
    # Sketch23 → Boss-Extrude23 (new body)
    with BuildSketch(Plane.XY.offset(BOSS_EXTRUDE23_START)):
        with Locations((-57.05, -4)):
            Rectangle(SKETCH23_W, SKETCH23_H)
    extrude(amount=BOSS_EXTRUDE23_DEPTH)


with BuildPart() as part_20:
    add(part_19.part)

    # Combine20: cut body 2 20
    add(body_2_20.part, mode=Mode.SUBTRACT)

    # Sketch24 → Boss-Extrude24 (add)
    with BuildSketch(Plane(origin=(0, 0, 0), x_dir=(1, 0, 0), z_dir=(0, 1, 0)).offset(BOSS_EXTRUDE24_START)):
        Polygon((-58.8, -74), (-58.8, -75), (-52.8, -75), (-52.8, -75.4), (-52.2, -75.4), (-51.4, -74.6), (-51.4, -74), align=None)
    extrude(amount=BOSS_EXTRUDE24_DEPTH)


solid = part_20.part
